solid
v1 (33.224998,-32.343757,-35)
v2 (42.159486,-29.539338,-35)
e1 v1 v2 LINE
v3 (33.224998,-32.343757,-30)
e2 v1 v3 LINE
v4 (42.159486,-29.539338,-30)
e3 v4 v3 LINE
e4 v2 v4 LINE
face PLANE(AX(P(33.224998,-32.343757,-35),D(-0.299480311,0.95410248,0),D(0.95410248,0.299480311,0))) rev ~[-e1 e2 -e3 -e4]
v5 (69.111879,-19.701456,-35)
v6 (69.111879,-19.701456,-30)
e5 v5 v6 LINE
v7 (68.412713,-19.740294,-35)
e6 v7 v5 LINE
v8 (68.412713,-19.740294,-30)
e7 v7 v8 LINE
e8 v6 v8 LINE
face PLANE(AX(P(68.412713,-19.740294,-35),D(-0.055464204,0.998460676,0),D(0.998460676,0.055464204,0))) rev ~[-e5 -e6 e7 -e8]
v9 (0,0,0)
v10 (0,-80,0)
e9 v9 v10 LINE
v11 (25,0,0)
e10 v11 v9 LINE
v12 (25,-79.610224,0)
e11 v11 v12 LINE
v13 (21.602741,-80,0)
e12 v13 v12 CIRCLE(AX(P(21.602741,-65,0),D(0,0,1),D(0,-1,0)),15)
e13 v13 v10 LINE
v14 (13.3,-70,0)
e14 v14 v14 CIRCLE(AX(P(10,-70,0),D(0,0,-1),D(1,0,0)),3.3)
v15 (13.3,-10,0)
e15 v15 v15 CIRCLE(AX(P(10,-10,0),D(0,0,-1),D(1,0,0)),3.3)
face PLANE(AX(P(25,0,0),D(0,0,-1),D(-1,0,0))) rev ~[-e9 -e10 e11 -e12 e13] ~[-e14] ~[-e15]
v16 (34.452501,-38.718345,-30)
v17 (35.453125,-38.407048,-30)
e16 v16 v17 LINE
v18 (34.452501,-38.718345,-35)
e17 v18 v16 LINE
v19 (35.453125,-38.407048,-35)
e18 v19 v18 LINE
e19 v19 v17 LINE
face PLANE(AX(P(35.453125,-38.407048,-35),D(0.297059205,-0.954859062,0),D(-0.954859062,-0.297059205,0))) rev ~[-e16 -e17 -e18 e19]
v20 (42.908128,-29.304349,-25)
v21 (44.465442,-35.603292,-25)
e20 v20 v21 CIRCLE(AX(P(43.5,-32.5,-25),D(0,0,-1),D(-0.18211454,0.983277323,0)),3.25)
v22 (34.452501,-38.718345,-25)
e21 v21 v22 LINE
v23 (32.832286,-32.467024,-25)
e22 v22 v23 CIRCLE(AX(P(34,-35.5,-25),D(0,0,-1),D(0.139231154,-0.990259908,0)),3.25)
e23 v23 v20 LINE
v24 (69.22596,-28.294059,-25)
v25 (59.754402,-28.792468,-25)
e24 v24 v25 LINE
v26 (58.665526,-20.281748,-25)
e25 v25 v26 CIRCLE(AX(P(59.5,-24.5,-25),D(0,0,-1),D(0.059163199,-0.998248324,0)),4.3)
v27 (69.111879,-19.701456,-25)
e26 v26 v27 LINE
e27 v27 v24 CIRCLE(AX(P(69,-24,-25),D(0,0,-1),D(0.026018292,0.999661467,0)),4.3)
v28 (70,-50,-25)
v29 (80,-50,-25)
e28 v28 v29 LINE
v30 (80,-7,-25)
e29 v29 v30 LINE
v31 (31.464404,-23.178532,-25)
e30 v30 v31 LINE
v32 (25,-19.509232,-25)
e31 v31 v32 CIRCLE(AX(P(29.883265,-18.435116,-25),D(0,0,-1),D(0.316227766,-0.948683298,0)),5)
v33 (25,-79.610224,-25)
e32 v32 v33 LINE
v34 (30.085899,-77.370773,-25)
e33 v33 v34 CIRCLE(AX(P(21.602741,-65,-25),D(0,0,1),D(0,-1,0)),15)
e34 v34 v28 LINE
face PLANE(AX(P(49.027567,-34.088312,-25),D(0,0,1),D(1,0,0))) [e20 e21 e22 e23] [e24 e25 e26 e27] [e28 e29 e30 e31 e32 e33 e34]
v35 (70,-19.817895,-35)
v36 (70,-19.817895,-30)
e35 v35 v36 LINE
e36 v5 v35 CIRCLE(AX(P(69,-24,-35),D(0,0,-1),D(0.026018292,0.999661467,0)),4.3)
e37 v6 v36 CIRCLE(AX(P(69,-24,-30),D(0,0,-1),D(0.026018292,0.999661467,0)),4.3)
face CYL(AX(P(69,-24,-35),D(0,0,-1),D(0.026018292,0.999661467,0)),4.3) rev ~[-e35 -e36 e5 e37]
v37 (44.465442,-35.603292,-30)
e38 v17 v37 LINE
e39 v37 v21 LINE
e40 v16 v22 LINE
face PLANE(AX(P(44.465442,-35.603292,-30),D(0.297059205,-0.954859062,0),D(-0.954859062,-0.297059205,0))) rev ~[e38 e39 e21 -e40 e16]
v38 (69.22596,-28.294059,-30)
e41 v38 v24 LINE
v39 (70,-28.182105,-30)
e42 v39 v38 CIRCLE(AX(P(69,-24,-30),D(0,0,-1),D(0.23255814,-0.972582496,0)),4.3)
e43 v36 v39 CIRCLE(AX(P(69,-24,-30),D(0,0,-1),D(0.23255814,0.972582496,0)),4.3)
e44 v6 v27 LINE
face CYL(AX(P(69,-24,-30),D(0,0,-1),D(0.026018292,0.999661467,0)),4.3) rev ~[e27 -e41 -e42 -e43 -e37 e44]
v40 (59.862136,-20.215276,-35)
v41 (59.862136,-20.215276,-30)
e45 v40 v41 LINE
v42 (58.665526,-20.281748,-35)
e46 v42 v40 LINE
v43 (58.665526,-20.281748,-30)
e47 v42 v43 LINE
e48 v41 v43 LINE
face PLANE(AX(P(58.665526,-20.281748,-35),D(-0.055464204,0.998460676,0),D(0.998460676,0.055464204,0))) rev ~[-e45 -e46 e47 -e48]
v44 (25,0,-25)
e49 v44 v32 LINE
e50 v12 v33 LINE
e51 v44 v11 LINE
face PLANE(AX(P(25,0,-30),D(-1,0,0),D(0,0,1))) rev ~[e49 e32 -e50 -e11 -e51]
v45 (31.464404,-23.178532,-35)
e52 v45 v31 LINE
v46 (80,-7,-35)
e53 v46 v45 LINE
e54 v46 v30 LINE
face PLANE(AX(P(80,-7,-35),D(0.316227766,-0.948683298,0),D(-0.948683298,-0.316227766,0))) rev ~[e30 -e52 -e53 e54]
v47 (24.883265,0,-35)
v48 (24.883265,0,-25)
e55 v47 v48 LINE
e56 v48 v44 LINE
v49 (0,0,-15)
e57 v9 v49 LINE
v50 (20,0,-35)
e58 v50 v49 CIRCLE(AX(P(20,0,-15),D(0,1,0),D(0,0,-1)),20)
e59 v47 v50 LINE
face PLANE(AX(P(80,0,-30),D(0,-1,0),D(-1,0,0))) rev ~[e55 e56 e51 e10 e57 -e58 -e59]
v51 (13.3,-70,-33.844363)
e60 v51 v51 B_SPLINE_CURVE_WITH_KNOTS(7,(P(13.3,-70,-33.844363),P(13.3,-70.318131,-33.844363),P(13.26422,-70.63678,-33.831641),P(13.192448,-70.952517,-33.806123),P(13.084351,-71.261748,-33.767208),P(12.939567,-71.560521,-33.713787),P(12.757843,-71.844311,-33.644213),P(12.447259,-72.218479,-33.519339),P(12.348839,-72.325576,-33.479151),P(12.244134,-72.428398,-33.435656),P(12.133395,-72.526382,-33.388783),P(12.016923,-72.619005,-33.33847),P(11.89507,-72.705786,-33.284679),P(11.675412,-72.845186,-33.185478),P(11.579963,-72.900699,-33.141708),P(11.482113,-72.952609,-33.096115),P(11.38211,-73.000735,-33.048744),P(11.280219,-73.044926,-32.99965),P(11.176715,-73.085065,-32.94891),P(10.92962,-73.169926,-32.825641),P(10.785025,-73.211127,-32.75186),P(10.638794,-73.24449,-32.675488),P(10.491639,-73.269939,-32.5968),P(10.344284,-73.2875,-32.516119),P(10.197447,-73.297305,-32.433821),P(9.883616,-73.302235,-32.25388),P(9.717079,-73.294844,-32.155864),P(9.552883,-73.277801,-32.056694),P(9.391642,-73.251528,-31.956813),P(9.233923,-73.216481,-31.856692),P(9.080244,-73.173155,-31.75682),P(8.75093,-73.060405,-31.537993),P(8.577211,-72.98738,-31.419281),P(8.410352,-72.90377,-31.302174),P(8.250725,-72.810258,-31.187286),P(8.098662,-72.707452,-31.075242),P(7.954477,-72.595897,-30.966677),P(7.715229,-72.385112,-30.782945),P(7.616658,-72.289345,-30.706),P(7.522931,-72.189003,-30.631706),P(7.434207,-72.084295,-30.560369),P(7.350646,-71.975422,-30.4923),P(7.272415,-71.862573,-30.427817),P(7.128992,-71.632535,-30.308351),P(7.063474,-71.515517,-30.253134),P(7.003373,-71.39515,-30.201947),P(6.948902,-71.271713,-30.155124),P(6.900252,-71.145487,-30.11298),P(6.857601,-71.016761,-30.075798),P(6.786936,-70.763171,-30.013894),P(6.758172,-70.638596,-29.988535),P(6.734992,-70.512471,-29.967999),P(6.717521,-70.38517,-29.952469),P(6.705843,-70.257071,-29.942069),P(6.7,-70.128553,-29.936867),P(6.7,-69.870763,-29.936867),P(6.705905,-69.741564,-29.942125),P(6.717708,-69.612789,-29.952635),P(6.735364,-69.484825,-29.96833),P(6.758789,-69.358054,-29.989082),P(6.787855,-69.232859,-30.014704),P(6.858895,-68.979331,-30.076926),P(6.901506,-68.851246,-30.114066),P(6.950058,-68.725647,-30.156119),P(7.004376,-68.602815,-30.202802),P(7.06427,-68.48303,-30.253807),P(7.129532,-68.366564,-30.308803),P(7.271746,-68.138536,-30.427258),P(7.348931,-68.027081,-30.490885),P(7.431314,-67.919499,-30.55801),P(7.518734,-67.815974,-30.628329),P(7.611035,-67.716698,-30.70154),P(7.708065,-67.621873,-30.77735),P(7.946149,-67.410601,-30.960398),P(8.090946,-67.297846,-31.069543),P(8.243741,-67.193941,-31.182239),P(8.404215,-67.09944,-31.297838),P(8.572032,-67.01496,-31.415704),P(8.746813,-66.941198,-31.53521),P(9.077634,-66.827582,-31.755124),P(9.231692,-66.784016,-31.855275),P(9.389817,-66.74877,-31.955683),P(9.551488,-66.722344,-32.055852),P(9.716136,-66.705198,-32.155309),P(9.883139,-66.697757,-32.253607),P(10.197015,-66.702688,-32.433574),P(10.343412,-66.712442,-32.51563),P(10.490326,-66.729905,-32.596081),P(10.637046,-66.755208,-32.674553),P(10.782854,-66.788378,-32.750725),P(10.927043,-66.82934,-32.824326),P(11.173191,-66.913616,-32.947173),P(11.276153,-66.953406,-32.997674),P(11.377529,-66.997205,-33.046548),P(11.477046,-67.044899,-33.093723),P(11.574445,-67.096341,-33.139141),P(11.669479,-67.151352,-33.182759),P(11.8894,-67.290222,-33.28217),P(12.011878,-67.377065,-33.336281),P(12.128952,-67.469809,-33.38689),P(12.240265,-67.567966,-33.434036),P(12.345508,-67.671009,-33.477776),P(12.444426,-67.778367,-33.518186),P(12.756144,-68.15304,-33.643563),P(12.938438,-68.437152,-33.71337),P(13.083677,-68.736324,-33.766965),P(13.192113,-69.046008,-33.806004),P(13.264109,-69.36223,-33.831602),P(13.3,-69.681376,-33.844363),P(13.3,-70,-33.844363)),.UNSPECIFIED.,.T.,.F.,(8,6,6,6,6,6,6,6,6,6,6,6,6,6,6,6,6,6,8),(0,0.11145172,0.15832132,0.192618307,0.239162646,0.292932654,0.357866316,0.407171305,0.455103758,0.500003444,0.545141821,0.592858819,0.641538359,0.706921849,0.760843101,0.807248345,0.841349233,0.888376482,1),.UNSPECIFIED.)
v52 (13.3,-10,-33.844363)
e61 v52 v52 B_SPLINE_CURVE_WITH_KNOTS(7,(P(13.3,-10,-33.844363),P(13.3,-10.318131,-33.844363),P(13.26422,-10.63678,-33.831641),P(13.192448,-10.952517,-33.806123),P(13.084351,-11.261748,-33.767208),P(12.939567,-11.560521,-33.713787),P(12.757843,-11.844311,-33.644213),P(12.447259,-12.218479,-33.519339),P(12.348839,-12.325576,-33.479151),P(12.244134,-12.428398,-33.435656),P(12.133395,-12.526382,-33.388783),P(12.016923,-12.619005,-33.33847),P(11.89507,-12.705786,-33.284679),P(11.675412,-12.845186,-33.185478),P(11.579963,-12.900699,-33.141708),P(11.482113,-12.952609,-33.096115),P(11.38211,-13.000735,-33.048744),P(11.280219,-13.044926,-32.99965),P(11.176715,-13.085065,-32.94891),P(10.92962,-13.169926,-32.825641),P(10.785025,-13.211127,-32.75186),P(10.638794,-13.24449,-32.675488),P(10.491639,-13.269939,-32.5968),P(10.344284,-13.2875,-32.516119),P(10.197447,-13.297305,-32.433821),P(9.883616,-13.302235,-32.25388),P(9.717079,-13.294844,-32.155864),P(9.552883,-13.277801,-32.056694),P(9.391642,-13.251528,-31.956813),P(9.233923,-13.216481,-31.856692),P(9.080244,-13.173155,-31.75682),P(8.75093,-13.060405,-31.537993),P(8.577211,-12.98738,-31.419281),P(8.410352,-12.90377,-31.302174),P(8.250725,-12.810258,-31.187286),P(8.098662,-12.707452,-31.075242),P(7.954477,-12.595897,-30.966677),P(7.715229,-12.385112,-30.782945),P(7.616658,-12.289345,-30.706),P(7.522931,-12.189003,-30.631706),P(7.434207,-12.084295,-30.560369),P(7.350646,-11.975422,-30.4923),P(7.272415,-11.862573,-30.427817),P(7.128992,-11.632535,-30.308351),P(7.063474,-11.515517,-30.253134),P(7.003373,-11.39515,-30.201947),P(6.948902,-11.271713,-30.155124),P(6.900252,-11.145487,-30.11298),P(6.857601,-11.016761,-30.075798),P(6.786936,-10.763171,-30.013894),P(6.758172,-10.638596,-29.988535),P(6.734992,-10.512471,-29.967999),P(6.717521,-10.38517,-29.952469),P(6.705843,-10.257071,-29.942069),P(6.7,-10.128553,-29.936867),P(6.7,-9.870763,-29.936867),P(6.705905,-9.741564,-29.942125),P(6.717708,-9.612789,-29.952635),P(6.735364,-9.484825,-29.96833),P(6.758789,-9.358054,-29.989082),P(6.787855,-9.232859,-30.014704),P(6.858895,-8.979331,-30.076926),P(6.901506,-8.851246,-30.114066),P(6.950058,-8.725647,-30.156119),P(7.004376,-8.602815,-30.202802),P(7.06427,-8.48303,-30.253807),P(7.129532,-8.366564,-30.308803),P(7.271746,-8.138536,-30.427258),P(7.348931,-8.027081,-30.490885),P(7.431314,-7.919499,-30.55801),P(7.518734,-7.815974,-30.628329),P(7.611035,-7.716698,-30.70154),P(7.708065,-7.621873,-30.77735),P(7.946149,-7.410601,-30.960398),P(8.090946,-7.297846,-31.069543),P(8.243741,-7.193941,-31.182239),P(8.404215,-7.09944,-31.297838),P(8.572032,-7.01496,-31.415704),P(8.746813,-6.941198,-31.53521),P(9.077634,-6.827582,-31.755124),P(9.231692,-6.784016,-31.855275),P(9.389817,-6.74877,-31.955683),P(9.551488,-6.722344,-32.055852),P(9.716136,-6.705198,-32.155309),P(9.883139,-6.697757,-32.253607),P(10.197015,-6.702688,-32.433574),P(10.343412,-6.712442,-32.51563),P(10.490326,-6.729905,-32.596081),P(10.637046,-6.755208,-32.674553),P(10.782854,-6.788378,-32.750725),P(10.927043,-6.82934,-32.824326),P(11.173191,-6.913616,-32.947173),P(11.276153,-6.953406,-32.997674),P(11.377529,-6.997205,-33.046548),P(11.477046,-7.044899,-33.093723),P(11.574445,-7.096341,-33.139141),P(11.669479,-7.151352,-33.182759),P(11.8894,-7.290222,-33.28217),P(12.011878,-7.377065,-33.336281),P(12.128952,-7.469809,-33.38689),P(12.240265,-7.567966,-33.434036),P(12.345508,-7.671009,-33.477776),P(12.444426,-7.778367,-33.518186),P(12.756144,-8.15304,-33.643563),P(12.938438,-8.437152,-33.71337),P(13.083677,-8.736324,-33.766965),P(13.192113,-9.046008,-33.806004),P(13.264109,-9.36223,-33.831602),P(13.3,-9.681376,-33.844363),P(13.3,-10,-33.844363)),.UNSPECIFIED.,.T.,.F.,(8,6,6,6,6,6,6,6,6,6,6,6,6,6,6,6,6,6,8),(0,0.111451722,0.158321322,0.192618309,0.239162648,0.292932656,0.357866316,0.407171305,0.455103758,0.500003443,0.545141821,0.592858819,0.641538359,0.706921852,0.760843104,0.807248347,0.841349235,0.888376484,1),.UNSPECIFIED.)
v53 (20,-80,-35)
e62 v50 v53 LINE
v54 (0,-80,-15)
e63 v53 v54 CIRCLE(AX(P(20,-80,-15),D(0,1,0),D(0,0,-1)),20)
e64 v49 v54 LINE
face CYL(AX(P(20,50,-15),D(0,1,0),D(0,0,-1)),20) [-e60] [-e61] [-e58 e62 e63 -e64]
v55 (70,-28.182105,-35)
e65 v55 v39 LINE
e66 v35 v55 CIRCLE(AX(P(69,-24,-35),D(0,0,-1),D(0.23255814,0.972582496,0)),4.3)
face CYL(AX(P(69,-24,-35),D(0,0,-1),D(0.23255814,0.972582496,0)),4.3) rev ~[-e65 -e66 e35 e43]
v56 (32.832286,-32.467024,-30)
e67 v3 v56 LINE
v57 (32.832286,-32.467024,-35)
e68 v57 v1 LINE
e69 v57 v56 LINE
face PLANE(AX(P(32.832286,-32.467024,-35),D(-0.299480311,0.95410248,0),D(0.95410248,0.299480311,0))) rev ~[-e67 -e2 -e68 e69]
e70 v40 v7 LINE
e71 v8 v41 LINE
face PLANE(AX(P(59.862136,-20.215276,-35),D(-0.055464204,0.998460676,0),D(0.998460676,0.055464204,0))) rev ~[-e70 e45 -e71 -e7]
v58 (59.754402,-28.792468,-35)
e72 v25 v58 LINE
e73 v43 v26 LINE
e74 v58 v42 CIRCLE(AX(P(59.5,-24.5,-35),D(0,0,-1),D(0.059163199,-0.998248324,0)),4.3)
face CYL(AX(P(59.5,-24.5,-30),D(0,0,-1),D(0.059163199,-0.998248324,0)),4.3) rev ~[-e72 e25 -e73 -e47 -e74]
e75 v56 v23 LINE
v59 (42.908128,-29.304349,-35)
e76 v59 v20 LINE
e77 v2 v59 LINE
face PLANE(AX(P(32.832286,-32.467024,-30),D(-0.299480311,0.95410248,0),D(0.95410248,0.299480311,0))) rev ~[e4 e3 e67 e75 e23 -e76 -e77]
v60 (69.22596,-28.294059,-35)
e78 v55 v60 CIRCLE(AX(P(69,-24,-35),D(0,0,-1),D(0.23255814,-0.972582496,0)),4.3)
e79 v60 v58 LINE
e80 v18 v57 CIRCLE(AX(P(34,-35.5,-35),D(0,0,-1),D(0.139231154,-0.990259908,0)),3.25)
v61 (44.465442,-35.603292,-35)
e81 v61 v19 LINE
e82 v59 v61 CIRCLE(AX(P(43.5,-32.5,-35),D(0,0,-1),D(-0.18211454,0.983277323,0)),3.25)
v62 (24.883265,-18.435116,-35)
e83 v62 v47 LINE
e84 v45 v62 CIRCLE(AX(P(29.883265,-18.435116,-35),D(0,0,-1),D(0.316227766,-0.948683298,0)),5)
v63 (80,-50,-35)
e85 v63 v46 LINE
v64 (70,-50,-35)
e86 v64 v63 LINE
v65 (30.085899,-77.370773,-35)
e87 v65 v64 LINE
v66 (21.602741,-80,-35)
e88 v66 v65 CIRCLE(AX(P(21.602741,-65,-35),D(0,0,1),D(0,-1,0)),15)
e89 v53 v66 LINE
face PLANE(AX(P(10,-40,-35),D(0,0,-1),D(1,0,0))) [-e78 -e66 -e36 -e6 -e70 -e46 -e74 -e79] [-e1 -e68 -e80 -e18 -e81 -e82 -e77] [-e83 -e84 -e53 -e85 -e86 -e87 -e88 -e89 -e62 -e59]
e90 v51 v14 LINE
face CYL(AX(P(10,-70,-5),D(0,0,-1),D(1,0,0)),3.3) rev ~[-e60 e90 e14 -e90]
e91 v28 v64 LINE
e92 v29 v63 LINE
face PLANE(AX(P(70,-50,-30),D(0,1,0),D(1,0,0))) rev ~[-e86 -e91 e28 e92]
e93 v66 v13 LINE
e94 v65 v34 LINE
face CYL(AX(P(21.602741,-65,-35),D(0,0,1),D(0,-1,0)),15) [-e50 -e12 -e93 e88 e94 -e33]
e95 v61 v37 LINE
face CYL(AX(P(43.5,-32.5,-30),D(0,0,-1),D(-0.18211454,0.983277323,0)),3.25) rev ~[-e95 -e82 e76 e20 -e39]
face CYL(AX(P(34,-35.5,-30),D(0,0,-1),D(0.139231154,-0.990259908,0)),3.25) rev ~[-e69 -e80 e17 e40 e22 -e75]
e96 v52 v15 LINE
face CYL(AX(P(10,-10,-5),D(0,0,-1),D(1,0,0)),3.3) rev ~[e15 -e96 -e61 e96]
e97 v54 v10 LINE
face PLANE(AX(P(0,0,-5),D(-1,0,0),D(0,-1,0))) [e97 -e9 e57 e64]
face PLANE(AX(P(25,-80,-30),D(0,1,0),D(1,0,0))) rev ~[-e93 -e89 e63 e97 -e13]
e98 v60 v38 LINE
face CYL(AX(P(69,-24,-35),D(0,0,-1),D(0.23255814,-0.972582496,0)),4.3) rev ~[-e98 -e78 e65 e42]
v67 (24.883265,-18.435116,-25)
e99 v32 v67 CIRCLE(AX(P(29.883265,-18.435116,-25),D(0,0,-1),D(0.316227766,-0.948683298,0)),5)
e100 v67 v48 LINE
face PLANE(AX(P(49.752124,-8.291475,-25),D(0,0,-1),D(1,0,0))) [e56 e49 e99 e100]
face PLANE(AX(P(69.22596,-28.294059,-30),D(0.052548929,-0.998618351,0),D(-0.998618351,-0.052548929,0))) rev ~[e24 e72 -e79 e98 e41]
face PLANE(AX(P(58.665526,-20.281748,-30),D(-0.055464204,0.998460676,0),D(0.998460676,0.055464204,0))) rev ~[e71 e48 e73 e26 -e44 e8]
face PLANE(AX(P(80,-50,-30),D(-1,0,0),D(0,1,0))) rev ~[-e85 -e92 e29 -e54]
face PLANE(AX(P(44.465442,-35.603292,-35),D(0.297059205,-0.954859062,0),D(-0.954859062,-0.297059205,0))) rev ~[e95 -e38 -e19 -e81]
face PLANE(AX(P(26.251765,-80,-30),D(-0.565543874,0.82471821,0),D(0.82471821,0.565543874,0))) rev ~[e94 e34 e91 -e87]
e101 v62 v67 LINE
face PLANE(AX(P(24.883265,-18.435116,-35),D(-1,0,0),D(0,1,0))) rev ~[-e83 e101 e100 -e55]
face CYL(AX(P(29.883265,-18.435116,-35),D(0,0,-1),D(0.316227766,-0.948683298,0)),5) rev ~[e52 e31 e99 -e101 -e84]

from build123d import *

# Parameters (mm, degrees)
F1_DEPTH     = 80
F2_R         = 3.3
F3_DEPTH     = 25
F5_DEPTH     = 25
F7_W         = 50
F7_H         = 5
F8_DEPTH     = 10
F9_DEPTH     = 25
F11_W        = 20
F11_H        = 80
F11_R        = 3.3
F12_DEPTH    = 30
F13_T1_DEPTH = 180
F15_DEPTH    = 5
F16_DEPTH    = 10
F17_R        = 15


# Not quite as in the source:
# - a fillet or chamfer that OpenCascade refuses, or shapes differently, is made with other operations: its cross-section is extruded or revolved along the edge and cut away or added


with BuildPart() as f1:
    # F0 (on Front) → F1 (new body)
    with BuildSketch(Plane.XZ):
        Polygon((25, 0), (0, 0), (0, -5), (20, -5), (20, -35), (70, -35), (70, -30), (25, -30), align=None)
    extrude(amount=F1_DEPTH)

    # F2 (on face) → F3 (cut)
    with BuildSketch(Plane(origin=(0, 0, -5), x_dir=(1, 0, 0), z_dir=(0, 0, -1))):
        with Locations((10, 70)):
            Circle(F2_R)
        with Locations((10, 10)):
            Circle(F2_R)
    extrude(amount=-F3_DEPTH, mode=Mode.SUBTRACT)

    # F4 (on face) → F5 (cut)
    with BuildSketch(Plane(origin=(0, 0, -35), x_dir=(1, 0, 0), z_dir=(0, 0, -1))):
        Polygon((26.251764968, 80), (70, 50), (70, 80), align=None)
    extrude(amount=-F5_DEPTH, mode=Mode.SUBTRACT)

    # F7 (on face) → F8 (join)
    with BuildSketch(Plane.YZ.offset(70)):
        with Locations((-25, -32.5)):
            Rectangle(F7_W, F7_H)
    extrude(amount=F8_DEPTH)

    # F6 (on face) → F9 (cut)
    with BuildSketch(Plane(origin=(0, 0, -35), x_dir=(1, 0, 0), z_dir=(0, 0, -1))):
        with BuildLine():
            Line((33.2249982655, 32.343756614), (42.1594857766, 29.5393376388))
            Line((42.1594857766, 29.5393376388), (42.9081277459, 29.3043486994))
            ThreePointArc((42.9081277459, 29.3043486994), (46.655005577, 31.7199744818), (44.4654424177, 35.6032919518))
            Line((44.4654424177, 35.6032919518), (35.4531247971, 38.407048043))
            Line((35.4531247971, 38.407048043), (34.4525012517, 38.7183447014))
            ThreePointArc((34.4525012517, 38.7183447014), (30.8539491948, 36.3153921333), (32.8322864897, 32.4670237129))
            Line((32.8322864897, 32.4670237129), (33.2249982655, 32.343756614))
        make_face()
        with BuildLine():
            Line((59.8621358425, 20.2152762479), (68.4127130059, 19.7402941432))
            Line((68.4127130059, 19.7402941432), (69.1118786564, 19.7014556922))
            ThreePointArc((69.1118786564, 19.7014556922), (69.558979499, 19.7364871386), (70, 19.8178952667))
            Line((70, 19.8178952667), (70, 28.1821047333))
            ThreePointArc((70, 28.1821047333), (69.6155307917, 28.2557163727), (69.2259603929, 28.2940589075))
            Line((69.2259603929, 28.2940589075), (59.7544017562, 28.7924677921))
            ThreePointArc((59.7544017562, 28.7924677921), (55.2347672319, 25.0457008651), (58.6655262733, 20.2817475657))
            Line((58.6655262733, 20.2817475657), (59.8621358425, 20.2152762479))
        make_face()
        with BuildLine():
            Line((70, 28.1821047333), (70, 19.8178952667))
            ThreePointArc((70, 19.8178952667), (73.3, 24), (70, 28.1821047333))
        make_face()
    extrude(amount=-F9_DEPTH, mode=Mode.SUBTRACT)

    # F11 (on face) → F12 (join)
    with BuildSketch(Plane(origin=(0, 0, -5), x_dir=(1, 0, 0), z_dir=(0, 0, -1))):
        with Locations((10, 40)):
            Rectangle(F11_W, F11_H)
        with Locations((10, 10)):
            Circle(F11_R, mode=Mode.SUBTRACT)
        with Locations((10, 70)):
            Circle(F11_R, mode=Mode.SUBTRACT)
    extrude(amount=F12_DEPTH)

    # F13: fillet of radius 20 on 1 edges, made by hand

    # F13_s2 → F13_t1 (cut)
    with BuildSketch(Plane.XZ.offset(-50)):
        with BuildLine():
            ThreePointArc((20, -35), (5.8578643763, -29.1421356237), (0, -15))
            Line((0, -15), (0, -35))
            Line((0, -35), (20, -35))
        make_face()
    extrude(amount=F13_T1_DEPTH, mode=Mode.SUBTRACT)

    # F14 (on face) → F15 (join)
    with BuildSketch(Plane.XY.offset(-30)):
        Polygon((80, 0), (25, 0), (25, -80), (26.251764968, -80), (70, -50), (80, -50), (80, -47.8473119438), align=None)
        with BuildLine():
            ThreePointArc((42.9081277459, -29.3043486994), (46.655005577, -31.7199744818), (44.4654424177, -35.6032919518))
            Line((44.4654424177, -35.6032919518), (34.4525012517, -38.7183447014))
            ThreePointArc((34.4525012517, -38.7183447014), (30.8539491948, -36.3153921333), (32.8322864897, -32.4670237129))
            Line((32.8322864897, -32.4670237129), (42.9081277459, -29.3043486994))
        make_face(mode=Mode.SUBTRACT)
        with BuildLine():
            ThreePointArc((69.1118786564, -19.7014556922), (73.2996210658, -23.9429150602), (69.2259603929, -28.2940589075))
            Line((69.2259603929, -28.2940589075), (59.7544017562, -28.7924677921))
            ThreePointArc((59.7544017562, -28.7924677921), (55.2347672319, -25.0457008651), (58.6655262733, -20.2817475657))
            Line((58.6655262733, -20.2817475657), (69.1118786564, -19.7014556922))
        make_face(mode=Mode.SUBTRACT)
    extrude(amount=F15_DEPTH)

    # F10 (on face) → F16 (cut)
    with BuildSketch(Plane(origin=(0, 0, -35), x_dir=(1, 0, 0), z_dir=(0, 0, -1))):
        with BuildLine():
            Line((80, 7), (31.4644035058, 23.1785321647))
            ThreePointArc((31.4644035058, 23.1785321647), (26.9597132524, 22.4913266004), (24.8832646757, 18.4351156745))
            Line((24.8832646757, 18.4351156745), (24.8832646757, 0))
            Line((24.8832646757, 0), (80, 0))
            Line((80, 0), (80, 7))
        make_face()
    extrude(amount=-F16_DEPTH, mode=Mode.SUBTRACT)

    # F17
    f17_edges = [f1.edges().sort_by_distance(p)[0] for p in [
        (26.251765, -80, -30),
    ]]
    fillet(f17_edges, radius=F17_R)


solid = f1.part
